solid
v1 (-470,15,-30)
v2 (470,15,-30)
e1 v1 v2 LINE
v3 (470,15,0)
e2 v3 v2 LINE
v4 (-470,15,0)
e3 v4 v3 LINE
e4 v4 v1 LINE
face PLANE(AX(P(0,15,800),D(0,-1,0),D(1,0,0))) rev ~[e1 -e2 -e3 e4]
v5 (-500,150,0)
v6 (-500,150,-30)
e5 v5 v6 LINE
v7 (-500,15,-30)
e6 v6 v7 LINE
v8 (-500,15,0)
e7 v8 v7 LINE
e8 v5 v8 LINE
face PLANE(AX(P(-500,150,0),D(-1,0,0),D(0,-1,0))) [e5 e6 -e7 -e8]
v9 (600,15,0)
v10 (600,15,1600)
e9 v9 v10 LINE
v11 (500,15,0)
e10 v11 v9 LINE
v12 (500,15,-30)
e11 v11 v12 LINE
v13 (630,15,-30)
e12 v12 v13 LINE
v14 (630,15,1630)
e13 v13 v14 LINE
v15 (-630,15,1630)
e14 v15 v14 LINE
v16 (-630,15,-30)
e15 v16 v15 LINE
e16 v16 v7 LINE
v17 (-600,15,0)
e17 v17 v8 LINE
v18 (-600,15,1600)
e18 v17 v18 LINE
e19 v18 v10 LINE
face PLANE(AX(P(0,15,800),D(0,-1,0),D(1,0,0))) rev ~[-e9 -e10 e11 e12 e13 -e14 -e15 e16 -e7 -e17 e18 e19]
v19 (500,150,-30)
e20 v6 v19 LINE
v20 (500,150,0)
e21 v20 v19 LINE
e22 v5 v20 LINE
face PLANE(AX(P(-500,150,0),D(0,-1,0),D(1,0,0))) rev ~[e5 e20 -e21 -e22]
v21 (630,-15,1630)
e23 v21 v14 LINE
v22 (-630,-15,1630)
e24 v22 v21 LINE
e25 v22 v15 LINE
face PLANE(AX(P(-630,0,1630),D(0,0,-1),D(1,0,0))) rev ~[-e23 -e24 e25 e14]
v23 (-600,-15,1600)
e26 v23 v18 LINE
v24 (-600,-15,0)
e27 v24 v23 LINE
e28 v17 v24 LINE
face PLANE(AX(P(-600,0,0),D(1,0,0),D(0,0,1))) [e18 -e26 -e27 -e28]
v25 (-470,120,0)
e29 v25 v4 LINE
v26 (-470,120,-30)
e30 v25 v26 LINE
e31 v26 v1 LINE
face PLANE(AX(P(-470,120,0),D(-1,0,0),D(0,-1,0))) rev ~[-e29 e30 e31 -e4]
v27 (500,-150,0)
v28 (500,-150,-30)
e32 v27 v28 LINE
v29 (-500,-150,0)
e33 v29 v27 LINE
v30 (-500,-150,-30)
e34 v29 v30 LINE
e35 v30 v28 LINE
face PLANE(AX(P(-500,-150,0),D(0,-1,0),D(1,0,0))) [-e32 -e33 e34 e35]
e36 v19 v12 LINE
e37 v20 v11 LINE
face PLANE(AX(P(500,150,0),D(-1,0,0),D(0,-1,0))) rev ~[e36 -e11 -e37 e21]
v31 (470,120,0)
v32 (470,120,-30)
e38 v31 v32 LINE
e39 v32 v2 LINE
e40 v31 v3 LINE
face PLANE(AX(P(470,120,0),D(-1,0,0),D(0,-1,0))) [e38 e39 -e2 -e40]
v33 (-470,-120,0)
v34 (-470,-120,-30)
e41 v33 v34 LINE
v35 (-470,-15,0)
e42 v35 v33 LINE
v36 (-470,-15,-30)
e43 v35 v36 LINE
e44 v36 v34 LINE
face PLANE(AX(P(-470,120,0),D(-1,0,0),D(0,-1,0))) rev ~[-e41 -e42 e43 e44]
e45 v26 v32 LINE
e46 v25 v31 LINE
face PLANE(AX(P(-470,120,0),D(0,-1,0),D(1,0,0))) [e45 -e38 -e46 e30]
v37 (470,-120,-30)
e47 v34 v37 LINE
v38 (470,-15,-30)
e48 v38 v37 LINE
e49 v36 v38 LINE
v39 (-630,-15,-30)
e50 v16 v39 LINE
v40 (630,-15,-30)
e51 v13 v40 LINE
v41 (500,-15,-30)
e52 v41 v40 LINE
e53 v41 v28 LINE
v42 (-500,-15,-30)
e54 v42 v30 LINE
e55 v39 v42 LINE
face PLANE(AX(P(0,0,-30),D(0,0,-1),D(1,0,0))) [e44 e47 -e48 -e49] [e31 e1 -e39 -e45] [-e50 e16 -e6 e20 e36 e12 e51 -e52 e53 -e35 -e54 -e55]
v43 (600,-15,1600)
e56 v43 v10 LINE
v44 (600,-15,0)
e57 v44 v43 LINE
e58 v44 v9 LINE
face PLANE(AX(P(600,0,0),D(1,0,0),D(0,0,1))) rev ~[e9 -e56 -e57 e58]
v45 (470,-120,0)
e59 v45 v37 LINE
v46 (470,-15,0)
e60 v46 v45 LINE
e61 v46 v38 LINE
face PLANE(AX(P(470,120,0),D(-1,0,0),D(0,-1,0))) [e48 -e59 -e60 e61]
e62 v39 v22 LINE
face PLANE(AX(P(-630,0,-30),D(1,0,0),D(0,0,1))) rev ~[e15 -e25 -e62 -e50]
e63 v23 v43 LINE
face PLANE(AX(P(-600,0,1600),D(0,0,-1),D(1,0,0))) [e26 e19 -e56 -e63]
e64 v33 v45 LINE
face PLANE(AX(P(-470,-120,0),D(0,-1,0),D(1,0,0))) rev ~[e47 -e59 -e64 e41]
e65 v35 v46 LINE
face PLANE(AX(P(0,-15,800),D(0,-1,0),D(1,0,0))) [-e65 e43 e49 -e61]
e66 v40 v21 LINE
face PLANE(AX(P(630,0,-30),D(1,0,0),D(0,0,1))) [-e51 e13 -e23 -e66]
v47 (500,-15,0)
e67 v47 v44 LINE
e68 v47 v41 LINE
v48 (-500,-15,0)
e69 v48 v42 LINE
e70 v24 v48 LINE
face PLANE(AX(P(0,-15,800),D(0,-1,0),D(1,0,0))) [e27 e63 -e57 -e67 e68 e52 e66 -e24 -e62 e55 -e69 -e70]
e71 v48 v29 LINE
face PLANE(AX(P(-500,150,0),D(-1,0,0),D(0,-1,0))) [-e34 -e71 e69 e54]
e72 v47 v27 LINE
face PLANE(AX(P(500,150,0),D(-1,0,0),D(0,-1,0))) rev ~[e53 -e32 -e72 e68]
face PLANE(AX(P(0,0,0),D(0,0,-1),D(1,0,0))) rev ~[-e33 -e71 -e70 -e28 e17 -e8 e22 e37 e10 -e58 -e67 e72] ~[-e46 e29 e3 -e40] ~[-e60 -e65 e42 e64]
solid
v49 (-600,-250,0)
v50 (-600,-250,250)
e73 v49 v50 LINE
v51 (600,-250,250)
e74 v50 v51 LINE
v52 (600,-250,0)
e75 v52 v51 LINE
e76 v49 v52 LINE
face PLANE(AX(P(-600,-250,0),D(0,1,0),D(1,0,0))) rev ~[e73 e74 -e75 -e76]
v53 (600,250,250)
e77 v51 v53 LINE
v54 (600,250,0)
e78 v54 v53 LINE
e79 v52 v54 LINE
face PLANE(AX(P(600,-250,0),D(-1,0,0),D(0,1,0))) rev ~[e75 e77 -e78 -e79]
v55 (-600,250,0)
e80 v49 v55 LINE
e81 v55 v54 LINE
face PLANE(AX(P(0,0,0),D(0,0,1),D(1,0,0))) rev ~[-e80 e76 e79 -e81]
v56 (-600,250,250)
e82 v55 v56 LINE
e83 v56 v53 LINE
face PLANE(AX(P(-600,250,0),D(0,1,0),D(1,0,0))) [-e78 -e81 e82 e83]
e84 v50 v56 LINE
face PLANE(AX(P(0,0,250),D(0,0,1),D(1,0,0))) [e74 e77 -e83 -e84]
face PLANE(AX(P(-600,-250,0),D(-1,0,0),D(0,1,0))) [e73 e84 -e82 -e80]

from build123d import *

# Parameters (mm, degrees)
F0_W     = 1200
F0_H     = 500
F1_DEPTH = 250
F2_W     = 1260
F2_H     = 1660
F2_W_2   = 1200
F2_H_2   = 1600
F3_DEPTH = 15
F4_W     = 1000
F4_H     = 300
F4_W_2   = 940
F4_H_2   = 240
F5_DEPTH = 30


with BuildPart() as f1:
    # F0 (on Top) → F1 (new body)
    with BuildSketch(Plane.XY):
        Rectangle(F0_W, F0_H)
    extrude(amount=F1_DEPTH)


with BuildPart() as f3:
    # F2 (on Front) → F3 (new body, symmetric)
    with BuildSketch(Plane.XZ):
        with Locations((0, 800)):
            Rectangle(F2_W, F2_H)
        with Locations((0, 800)):
            Rectangle(F2_W_2, F2_H_2, mode=Mode.SUBTRACT)
    extrude(amount=F3_DEPTH, both=True)

    # F4 (on face) → F5 (join)
    with BuildSketch(Plane(origin=(0, 0, 0), x_dir=(1, 0, 0), z_dir=(0, 0, -1))):
        Rectangle(F4_W, F4_H)
        Rectangle(F4_W_2, F4_H_2, mode=Mode.SUBTRACT)
    extrude(amount=F5_DEPTH)


solid = Compound([f1.part, f3.part])
